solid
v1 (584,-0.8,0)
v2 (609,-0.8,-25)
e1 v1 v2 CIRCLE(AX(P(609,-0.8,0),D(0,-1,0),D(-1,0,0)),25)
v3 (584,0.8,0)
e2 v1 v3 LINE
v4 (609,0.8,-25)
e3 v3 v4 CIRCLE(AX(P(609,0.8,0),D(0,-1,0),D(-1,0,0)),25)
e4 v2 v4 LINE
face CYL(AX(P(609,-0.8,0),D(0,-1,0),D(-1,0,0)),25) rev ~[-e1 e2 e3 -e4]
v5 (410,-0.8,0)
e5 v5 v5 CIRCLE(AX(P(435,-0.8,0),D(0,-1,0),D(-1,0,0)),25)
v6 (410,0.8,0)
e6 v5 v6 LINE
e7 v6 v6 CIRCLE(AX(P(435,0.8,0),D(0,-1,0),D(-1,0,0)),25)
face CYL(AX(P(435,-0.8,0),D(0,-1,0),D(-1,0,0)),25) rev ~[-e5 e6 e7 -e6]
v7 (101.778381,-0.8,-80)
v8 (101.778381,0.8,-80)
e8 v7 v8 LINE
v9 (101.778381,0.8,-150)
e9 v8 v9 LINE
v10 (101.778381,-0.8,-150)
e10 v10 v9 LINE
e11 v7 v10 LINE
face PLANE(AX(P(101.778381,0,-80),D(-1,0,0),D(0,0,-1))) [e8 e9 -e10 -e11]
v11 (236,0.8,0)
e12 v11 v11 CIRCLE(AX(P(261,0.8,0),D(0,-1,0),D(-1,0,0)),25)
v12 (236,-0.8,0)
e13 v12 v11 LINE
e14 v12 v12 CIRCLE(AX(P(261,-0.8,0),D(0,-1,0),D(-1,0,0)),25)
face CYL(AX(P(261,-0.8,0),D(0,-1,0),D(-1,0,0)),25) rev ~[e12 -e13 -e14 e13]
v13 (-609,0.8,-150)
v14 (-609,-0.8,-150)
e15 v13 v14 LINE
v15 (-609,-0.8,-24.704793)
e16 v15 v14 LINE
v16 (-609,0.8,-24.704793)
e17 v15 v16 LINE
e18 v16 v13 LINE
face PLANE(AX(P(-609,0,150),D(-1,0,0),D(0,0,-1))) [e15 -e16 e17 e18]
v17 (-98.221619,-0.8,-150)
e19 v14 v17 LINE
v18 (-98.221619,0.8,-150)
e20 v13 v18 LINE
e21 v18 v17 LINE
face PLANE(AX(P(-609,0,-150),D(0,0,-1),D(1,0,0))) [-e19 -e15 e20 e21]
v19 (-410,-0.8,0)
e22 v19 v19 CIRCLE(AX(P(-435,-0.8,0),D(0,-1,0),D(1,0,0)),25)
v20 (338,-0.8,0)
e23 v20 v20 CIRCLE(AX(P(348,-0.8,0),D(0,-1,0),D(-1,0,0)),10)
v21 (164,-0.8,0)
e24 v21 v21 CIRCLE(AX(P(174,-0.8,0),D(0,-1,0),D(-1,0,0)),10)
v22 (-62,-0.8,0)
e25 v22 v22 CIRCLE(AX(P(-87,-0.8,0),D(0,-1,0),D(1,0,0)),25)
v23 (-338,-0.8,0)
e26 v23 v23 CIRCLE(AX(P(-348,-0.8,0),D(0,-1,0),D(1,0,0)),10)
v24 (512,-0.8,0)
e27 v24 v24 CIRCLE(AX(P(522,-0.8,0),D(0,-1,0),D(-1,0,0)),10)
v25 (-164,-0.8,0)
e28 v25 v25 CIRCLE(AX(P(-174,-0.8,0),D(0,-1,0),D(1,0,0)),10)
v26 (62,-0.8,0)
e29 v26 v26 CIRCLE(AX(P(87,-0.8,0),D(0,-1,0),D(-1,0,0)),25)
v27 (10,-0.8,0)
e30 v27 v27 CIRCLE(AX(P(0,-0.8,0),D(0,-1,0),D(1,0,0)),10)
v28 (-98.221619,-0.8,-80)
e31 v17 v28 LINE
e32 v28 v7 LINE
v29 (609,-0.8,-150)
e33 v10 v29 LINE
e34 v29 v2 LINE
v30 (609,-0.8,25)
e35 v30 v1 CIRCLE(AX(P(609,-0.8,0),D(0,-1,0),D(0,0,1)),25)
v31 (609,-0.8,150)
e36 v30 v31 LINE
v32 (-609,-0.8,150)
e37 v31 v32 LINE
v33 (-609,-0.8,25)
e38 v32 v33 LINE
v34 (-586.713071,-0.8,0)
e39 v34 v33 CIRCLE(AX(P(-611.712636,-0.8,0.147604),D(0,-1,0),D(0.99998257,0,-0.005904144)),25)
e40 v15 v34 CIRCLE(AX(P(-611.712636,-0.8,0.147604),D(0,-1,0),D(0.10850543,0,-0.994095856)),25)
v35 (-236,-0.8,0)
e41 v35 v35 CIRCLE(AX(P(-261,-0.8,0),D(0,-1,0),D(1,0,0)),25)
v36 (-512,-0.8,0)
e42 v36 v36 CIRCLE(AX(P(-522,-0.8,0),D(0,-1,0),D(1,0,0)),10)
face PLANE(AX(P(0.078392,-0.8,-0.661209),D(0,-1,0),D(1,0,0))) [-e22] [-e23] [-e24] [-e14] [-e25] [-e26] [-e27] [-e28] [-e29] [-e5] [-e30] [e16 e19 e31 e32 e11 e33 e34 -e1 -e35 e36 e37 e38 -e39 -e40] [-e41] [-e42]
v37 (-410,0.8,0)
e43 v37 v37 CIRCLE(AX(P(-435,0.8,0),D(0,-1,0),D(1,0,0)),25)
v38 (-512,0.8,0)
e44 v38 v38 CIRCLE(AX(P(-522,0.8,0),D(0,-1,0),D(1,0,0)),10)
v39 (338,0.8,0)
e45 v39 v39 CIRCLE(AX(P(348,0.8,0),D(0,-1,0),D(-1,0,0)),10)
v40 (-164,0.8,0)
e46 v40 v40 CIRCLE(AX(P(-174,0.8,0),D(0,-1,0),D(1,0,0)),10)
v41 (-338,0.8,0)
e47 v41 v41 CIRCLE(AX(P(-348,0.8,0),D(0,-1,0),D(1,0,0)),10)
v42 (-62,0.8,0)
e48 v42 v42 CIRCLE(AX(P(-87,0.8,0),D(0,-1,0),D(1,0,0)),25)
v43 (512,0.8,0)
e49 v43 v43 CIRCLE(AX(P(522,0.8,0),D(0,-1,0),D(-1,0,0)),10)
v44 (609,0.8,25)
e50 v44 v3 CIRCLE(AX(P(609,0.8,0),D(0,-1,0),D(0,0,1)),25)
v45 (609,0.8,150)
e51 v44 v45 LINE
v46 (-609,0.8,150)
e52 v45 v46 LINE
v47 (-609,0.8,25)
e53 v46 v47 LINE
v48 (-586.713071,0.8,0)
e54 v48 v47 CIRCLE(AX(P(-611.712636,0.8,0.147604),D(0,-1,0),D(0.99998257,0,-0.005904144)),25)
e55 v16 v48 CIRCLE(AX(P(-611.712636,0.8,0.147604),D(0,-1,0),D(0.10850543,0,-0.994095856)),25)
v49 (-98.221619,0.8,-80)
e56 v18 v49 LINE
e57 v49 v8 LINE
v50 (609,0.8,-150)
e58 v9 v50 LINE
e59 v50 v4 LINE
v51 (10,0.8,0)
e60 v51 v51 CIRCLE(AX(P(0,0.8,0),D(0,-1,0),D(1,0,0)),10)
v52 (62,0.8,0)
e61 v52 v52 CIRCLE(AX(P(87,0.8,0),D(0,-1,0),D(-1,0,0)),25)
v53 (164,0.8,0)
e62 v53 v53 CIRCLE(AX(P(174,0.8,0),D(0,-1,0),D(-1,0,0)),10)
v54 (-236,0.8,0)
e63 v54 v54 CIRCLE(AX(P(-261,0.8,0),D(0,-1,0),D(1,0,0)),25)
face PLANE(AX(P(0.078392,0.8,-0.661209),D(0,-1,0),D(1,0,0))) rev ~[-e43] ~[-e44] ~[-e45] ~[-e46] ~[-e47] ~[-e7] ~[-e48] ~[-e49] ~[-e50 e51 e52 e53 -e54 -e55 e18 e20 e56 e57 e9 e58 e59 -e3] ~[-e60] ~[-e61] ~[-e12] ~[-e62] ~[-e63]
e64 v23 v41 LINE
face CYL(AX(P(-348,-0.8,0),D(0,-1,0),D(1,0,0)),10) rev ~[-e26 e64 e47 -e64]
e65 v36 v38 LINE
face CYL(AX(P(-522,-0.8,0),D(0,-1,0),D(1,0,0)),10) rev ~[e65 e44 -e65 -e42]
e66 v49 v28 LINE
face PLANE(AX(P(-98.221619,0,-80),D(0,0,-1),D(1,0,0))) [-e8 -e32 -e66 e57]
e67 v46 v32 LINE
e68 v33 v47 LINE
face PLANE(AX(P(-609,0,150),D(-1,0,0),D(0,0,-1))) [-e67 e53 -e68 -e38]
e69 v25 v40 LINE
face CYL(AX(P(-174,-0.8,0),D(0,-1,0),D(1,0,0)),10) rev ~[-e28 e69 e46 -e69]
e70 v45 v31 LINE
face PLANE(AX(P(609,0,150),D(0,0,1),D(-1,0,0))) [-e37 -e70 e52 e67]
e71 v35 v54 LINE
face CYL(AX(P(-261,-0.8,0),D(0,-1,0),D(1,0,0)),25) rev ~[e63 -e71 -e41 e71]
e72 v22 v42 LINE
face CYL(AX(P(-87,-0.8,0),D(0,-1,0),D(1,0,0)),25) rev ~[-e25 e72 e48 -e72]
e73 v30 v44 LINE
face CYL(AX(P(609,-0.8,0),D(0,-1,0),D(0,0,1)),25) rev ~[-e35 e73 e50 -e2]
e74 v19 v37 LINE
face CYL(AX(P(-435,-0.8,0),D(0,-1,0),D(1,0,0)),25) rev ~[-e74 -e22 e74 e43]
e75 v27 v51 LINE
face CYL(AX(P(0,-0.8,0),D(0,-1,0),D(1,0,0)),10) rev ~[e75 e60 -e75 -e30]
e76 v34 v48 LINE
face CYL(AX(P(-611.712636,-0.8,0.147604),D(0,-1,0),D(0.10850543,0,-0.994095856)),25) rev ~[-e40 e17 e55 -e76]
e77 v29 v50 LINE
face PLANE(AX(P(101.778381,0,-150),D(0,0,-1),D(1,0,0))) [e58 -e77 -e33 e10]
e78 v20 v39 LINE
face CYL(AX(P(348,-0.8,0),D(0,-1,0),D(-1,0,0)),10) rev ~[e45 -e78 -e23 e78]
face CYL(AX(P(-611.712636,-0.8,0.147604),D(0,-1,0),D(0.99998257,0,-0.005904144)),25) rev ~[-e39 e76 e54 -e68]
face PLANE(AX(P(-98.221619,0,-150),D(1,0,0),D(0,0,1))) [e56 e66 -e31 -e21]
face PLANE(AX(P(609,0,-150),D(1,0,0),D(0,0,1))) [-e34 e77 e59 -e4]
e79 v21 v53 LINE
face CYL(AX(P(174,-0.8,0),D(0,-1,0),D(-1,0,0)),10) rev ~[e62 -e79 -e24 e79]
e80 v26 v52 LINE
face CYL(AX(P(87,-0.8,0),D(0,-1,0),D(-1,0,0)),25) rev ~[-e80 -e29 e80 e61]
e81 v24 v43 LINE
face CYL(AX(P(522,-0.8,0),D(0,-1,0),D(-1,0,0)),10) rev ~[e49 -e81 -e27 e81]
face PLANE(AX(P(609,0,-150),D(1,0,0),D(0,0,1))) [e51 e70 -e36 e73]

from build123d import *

# Parameters (mm, degrees)
F1_DEPTH = 0.8
F3_DEPTH = 25


# Not quite as in the source:
# - a feature names something its author has since deleted; it is built from what else it names


with BuildPart() as f1:
    # F0 (on Front) → F1 (new body, symmetric)
    with BuildSketch(Plane.XZ):
        Polygon((609, -150), (609, 150), (-609, 150), (-609, -150), (-98.2216194272, -150), (-98.2216194272, -80), (101.7783805728, -80), (101.7783805728, -150), align=None)
    extrude(amount=F1_DEPTH, both=True)

    # F2 (on face) → F3 (cut)
    with BuildSketch(Plane.XZ.offset(0.8)):
        with BuildLine():
            Line((-609, 0), (-586.7130714899, 0))
            ThreePointArc((-586.7130714899, 0), (-593.05140569, 16.7836636007), (-609, 25))
            Line((-609, 25), (-609, 0))
        make_face()
        with BuildLine():
            ThreePointArc((-460, 0), (-435, -25), (-410, 0))
            Line((-410, 0), (-435, 0))
            Line((-435, 0), (-460, 0))
        make_face()
        with BuildLine():
            Line((-435, 0), (-410, 0))
            ThreePointArc((-410, 0), (-435, 25), (-460, 0))
            Line((-460, 0), (-435, 0))
        make_face()
        with BuildLine():
            ThreePointArc((-286, 0), (-261, -25), (-236, 0))
            Line((-236, 0), (-261, 0))
            Line((-261, 0), (-286, 0))
        make_face()
        with BuildLine():
            Line((-261, 0), (-236, 0))
            ThreePointArc((-236, 0), (-261, 25), (-286, 0))
            Line((-286, 0), (-261, 0))
        make_face()
        with BuildLine():
            ThreePointArc((-112, 0), (-87, -25), (-62, 0))
            Line((-62, 0), (-87, 0))
            Line((-87, 0), (-112, 0))
        make_face()
        with BuildLine():
            Line((-87, 0), (-62, 0))
            ThreePointArc((-62, 0), (-87, 25), (-112, 0))
            Line((-112, 0), (-87, 0))
        make_face()
        with BuildLine():
            ThreePointArc((112, 0), (87, 25), (62, 0))
            Line((62, 0), (87, 0))
            Line((87, 0), (112, 0))
        make_face()
        with BuildLine():
            Line((87, 0), (62, 0))
            ThreePointArc((62, 0), (87, -25), (112, 0))
            Line((112, 0), (87, 0))
        make_face()
        with BuildLine():
            ThreePointArc((286, 0), (261, 25), (236, 0))
            Line((236, 0), (261, 0))
            Line((261, 0), (286, 0))
        make_face()
        with BuildLine():
            Line((261, 0), (236, 0))
            ThreePointArc((236, 0), (261, -25), (286, 0))
            Line((286, 0), (261, 0))
        make_face()
        with BuildLine():
            ThreePointArc((460, 0), (435, 25), (410, 0))
            Line((410, 0), (435, 0))
            Line((435, 0), (460, 0))
        make_face()
        with BuildLine():
            Line((435, 0), (410, 0))
            ThreePointArc((410, 0), (435, -25), (460, 0))
            Line((460, 0), (435, 0))
        make_face()
        with BuildLine():
            ThreePointArc((-609, -24.7047928188), (-593.1499526355, -16.5983450419), (-586.7130714899, 0))
            Line((-586.7130714899, 0), (-609, 0))
            Line((-609, 0), (-609, -24.7047928188))
        make_face()
        with BuildLine():
            ThreePointArc((609, 25), (591.3223304703, 17.6776695297), (584, 0))
            Line((584, 0), (609, 0))
            Line((609, 0), (609, 25))
        make_face()
        with BuildLine():
            Line((609, 0), (584, 0))
            ThreePointArc((584, 0), (591.3223304703, -17.6776695297), (609, -25))
            Line((609, -25), (609, 0))
        make_face()
        with BuildLine():
            ThreePointArc((-532, 0), (-522, -10), (-512, 0))
            Line((-512, 0), (-532, 0))
        make_face()
        with BuildLine():
            Line((-532, 0), (-512, 0))
            ThreePointArc((-512, 0), (-522, 10), (-532, 0))
        make_face()
        with BuildLine():
            ThreePointArc((-358, 0), (-348, -10), (-338, 0))
            Line((-338, 0), (-358, 0))
        make_face()
        with BuildLine():
            Line((-358, 0), (-338, 0))
            ThreePointArc((-338, 0), (-348, 10), (-358, 0))
        make_face()
        with BuildLine():
            ThreePointArc((-184, 0), (-174, -10), (-164, 0))
            Line((-164, 0), (-184, 0))
        make_face()
        with BuildLine():
            Line((-184, 0), (-164, 0))
            ThreePointArc((-164, 0), (-174, 10), (-184, 0))
        make_face()
        with BuildLine():
            Line((0, 0), (-10, 0))
            ThreePointArc((-10, 0), (0, -10), (10, 0))
            Line((10, 0), (0, 0))
        make_face()
        with BuildLine():
            ThreePointArc((10, 0), (0, 10), (-10, 0))
            Line((-10, 0), (0, 0))
            Line((0, 0), (10, 0))
        make_face()
        with BuildLine():
            ThreePointArc((184, 0), (174, 10), (164, 0))
            Line((164, 0), (184, 0))
        make_face()
        with BuildLine():
            Line((184, 0), (164, 0))
            ThreePointArc((164, 0), (174, -10), (184, 0))
        make_face()
        with BuildLine():
            ThreePointArc((358, 0), (348, 10), (338, 0))
            Line((338, 0), (358, 0))
        make_face()
        with BuildLine():
            Line((358, 0), (338, 0))
            ThreePointArc((338, 0), (348, -10), (358, 0))
        make_face()
        with BuildLine():
            ThreePointArc((532, 0), (522, 10), (512, 0))
            Line((512, 0), (532, 0))
        make_face()
        with BuildLine():
            Line((532, 0), (512, 0))
            ThreePointArc((512, 0), (522, -10), (532, 0))
        make_face()
    extrude(amount=-F3_DEPTH, mode=Mode.SUBTRACT)


solid = f1.part
